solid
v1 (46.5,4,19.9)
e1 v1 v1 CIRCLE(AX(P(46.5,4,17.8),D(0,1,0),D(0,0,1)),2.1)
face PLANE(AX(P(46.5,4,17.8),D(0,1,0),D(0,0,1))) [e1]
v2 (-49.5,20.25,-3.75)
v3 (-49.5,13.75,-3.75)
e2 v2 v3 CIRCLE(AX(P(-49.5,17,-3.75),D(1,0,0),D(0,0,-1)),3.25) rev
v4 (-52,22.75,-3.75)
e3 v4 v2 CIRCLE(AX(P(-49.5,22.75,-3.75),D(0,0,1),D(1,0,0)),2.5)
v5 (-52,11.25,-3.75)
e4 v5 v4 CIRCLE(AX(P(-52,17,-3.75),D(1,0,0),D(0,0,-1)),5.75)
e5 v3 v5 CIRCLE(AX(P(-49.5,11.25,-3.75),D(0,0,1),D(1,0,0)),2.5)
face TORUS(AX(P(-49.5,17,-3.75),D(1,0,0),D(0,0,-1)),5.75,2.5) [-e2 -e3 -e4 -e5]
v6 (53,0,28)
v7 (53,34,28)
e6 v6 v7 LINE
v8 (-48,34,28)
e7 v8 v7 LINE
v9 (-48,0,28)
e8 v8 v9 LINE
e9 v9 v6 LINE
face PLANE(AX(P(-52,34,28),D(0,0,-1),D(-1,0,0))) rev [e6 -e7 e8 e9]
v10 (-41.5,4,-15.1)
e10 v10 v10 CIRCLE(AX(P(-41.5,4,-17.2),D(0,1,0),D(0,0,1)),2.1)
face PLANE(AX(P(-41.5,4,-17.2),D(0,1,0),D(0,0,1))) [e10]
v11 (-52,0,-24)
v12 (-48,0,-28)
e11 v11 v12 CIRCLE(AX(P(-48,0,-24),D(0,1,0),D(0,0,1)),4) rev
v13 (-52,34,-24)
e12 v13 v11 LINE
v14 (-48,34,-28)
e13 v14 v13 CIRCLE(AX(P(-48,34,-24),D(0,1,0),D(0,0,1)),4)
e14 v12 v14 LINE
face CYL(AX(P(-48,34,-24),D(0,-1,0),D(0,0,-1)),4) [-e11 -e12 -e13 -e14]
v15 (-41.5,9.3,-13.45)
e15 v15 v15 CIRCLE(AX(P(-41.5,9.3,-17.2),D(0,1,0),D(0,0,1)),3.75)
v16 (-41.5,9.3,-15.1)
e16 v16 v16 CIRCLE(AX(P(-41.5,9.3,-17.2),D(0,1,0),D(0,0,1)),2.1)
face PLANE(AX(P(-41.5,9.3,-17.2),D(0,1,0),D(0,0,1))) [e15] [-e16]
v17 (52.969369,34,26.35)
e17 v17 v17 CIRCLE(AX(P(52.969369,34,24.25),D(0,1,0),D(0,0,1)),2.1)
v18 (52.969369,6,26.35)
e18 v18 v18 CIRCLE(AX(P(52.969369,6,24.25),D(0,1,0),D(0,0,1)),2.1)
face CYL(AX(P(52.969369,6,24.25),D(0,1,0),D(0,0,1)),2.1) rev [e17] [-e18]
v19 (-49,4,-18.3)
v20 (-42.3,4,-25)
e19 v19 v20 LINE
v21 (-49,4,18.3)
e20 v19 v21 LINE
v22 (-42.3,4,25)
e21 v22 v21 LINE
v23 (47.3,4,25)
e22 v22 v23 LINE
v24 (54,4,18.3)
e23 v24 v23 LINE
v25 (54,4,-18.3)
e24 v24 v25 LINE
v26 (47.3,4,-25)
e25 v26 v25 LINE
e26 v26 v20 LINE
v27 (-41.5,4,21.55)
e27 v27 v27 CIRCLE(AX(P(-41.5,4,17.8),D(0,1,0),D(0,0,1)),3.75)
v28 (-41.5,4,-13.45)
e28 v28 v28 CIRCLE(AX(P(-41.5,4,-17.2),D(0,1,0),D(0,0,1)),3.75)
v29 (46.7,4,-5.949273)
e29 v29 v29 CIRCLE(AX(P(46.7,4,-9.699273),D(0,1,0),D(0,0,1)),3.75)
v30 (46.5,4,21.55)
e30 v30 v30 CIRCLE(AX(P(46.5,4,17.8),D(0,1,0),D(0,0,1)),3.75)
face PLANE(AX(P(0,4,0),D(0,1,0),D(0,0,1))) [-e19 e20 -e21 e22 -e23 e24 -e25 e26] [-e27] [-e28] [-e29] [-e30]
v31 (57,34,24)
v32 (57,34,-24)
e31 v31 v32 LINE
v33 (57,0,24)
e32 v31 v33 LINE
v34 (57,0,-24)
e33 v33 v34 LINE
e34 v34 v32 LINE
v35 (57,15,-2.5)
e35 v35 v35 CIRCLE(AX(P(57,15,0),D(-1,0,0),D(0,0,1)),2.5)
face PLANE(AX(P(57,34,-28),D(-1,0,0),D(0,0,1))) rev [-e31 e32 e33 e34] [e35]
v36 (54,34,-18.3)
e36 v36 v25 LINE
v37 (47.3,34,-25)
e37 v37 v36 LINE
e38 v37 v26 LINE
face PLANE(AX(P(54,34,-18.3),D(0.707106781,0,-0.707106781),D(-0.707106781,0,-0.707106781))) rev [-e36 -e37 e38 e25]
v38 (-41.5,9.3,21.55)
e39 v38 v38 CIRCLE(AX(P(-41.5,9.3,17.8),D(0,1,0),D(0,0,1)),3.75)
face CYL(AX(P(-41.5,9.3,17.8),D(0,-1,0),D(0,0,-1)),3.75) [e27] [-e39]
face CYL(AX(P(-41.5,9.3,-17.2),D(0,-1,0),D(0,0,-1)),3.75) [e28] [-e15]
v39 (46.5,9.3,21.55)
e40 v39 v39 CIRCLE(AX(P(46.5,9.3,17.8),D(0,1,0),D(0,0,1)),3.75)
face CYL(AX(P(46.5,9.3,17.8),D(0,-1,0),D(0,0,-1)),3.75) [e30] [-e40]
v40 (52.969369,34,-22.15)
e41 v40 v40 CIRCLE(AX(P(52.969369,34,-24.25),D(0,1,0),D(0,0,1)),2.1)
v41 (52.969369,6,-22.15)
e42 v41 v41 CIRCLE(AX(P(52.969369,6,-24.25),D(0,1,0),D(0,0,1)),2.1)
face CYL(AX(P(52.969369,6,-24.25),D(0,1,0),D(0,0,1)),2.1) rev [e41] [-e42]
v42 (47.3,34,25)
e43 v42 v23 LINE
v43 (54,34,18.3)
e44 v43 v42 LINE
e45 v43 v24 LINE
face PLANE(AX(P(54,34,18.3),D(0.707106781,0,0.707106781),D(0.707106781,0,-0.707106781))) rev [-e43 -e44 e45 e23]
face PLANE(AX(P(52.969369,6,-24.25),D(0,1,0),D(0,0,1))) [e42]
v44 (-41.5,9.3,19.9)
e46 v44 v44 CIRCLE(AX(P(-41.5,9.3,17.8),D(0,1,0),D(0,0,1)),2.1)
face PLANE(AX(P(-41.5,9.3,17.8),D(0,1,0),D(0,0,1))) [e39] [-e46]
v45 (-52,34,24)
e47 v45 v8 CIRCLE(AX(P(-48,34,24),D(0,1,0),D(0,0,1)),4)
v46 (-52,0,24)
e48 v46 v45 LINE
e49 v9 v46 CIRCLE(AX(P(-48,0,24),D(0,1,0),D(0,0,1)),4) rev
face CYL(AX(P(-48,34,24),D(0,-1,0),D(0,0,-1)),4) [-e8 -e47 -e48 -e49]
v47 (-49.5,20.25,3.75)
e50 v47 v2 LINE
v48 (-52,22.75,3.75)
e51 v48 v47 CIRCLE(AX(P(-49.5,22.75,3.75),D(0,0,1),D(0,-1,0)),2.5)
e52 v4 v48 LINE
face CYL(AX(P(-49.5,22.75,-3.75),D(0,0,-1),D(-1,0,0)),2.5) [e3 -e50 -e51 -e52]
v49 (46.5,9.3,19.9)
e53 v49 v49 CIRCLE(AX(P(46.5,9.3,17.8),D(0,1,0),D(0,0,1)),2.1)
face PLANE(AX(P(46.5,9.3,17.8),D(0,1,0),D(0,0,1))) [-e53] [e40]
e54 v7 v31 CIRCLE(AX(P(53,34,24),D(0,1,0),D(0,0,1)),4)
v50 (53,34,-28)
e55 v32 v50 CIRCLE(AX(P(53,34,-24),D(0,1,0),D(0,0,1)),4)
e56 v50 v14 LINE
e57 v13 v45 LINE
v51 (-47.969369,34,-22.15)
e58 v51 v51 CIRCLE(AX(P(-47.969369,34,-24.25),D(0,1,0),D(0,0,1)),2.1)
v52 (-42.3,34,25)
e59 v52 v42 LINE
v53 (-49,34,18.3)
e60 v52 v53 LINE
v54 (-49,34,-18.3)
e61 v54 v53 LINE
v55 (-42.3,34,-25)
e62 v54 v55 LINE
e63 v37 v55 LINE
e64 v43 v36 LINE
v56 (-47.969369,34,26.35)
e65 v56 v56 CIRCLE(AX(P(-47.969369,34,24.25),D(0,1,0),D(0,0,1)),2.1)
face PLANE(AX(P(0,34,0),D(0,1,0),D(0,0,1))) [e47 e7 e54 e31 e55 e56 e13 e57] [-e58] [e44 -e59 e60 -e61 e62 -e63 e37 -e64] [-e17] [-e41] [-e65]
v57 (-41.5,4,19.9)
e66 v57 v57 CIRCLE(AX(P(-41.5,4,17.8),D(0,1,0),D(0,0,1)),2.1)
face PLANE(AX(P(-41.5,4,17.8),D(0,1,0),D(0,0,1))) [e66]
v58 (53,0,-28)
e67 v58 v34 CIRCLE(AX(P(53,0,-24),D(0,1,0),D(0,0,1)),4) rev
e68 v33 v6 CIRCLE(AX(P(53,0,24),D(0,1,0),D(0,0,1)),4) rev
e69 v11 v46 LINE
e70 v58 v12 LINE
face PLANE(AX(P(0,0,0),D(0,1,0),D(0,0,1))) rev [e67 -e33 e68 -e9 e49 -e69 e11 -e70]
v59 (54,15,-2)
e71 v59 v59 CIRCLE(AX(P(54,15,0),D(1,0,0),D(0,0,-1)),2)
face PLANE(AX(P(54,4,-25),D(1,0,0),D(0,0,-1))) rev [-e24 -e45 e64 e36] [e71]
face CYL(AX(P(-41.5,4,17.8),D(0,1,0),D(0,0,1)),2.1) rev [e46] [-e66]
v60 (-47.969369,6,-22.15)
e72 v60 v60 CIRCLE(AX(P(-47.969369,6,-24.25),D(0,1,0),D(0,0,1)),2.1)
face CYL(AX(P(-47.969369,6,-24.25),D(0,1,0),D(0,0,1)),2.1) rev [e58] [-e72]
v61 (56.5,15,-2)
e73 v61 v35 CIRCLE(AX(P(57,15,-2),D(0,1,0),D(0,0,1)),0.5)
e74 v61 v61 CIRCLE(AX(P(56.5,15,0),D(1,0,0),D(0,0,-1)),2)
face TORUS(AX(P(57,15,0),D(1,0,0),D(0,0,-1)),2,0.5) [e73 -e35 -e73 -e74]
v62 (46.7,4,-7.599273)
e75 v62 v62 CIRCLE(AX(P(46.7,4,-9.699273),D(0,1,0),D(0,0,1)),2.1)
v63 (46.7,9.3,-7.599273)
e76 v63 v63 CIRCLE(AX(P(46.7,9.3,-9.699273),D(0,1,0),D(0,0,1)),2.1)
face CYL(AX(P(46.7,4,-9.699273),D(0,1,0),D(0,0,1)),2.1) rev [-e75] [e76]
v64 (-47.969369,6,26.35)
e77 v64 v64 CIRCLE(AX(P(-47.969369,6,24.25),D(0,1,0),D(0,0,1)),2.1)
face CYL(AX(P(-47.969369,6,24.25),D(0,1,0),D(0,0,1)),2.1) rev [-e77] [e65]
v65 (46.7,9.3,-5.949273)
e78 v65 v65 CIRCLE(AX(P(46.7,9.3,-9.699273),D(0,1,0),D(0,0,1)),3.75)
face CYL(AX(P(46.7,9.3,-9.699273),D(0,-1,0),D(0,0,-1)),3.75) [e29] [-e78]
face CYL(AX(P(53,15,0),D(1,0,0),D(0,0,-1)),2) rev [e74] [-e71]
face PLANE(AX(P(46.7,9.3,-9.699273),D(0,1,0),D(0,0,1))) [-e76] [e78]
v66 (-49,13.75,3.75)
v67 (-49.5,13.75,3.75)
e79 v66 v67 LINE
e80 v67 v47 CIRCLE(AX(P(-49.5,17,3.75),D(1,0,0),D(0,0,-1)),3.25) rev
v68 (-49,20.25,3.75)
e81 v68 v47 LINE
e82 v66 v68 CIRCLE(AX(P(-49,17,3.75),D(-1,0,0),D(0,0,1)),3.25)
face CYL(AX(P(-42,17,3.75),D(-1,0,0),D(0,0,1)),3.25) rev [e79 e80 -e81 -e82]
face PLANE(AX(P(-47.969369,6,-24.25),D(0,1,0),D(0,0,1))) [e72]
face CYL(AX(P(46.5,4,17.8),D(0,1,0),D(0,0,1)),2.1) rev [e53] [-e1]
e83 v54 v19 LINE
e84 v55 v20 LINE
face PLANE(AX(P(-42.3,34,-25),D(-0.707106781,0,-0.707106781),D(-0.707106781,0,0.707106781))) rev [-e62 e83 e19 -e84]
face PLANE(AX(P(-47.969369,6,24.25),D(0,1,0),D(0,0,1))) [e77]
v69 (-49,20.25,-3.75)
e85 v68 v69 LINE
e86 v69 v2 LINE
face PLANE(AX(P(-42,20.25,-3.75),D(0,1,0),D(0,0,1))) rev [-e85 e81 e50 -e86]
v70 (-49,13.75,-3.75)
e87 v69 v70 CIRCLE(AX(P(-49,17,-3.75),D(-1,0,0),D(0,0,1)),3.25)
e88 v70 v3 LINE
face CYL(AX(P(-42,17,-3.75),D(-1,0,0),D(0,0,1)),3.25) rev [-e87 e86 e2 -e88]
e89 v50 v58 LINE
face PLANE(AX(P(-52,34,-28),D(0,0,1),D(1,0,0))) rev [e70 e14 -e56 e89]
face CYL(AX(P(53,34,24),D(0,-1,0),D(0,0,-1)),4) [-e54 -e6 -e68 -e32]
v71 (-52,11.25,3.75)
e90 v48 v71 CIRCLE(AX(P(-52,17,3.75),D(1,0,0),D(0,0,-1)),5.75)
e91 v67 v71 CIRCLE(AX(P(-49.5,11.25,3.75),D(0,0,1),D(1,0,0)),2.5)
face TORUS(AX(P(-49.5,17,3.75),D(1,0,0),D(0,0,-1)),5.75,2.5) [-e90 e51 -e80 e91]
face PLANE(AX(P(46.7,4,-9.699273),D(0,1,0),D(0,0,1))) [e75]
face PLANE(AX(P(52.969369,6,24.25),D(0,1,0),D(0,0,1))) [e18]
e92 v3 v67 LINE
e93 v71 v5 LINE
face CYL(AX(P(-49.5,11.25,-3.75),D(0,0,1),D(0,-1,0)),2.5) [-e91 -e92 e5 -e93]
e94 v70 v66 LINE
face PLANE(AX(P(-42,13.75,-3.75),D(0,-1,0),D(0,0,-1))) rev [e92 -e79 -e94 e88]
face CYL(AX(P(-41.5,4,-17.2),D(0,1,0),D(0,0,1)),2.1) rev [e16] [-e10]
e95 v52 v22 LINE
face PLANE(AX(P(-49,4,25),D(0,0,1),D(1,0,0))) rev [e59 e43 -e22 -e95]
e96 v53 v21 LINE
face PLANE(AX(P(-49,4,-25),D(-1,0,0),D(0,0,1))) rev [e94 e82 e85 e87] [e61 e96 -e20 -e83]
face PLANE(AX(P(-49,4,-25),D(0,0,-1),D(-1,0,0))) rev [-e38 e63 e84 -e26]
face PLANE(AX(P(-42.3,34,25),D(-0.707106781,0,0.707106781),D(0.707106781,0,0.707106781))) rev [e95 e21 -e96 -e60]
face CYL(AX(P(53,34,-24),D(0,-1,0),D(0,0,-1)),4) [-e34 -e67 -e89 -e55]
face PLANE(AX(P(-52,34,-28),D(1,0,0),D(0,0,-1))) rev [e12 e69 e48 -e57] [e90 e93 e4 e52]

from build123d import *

# Parameters (mm, degrees)
SKETCH1_W                          = 109
SKETCH1_H                          = 56
BASE_PLATE_DEPTH                   = 34
SKETCH2_W                          = 103
SKETCH2_H                          = 50
BASE_PLATE_EXTRUDED_CUT_PART_DEPTH = 30
BASE_PLATE_4_SCREWS_DEPTH          = 30
FILLET1_R                          = 4
SKETCH4_R                          = 3.75
PCB_STANDS_DEPTH                   = 5.3
SKETCH5_R                          = 2.1
CUT_EXTRUDE1_DEPTH                 = 5.3
SKETCH8_R                          = 2
CUT_EXTRUDE4_DEPTH                 = 4
SKETCH71_R                         = 2.1
CUT_EXTRUDE5_DEPTH                 = 28
CUT_EXTRUDE7_DEPTH                 = 10
FILLET3_R                          = 2.5


# Read off the part's stored shape, not the designer's step: Sweep1
with BuildPart() as part:
    # Sketch1 → Base_Plate (new body)
    with BuildSketch(Plane(origin=(0, 0, 0), x_dir=(1, 0, 0), z_dir=(0, 1, 0))):
        with Locations((2.5, 0)):
            Rectangle(SKETCH1_W, SKETCH1_H)
    extrude(amount=BASE_PLATE_DEPTH)

    # Sketch2 → Base_Plate_Extruded_Cut_Part (cut)
    with BuildSketch(Plane(origin=(0, 34, 0), x_dir=(1, 0, 0), z_dir=(0, 1, 0))):
        with Locations((2.5, 0)):
            Rectangle(SKETCH2_W, SKETCH2_H)
    extrude(amount=-BASE_PLATE_EXTRUDED_CUT_PART_DEPTH, mode=Mode.SUBTRACT)

    # Sketch3 → Base_Plate_4_screws (add)
    with BuildSketch(Plane(origin=(0, 4, 0), x_dir=(1, 0, 0), z_dir=(0, 1, 0))):
        Polygon((-49, -25), (-42.3, -25), (-49, -18.3), align=None)
        Polygon((-49, 25), (-42.3, 25), (-49, 18.3), align=None)
        Polygon((54, 25), (54, 18.3), (47.3, 25), align=None)
        Polygon((54, -25), (54, -18.3), (47.3, -25), align=None)
    extrude(amount=BASE_PLATE_4_SCREWS_DEPTH)

    # Fillet1
    fillet1_edges = [part.edges().sort_by_distance(p)[0] for p in [
        (-52, 17, -28),
        (57, 17, -28),
        (57, 17, 28),
        (-52, 17, 28),
    ]]
    fillet(fillet1_edges, radius=FILLET1_R)

    # Sketch4 → PCB_Stands (add)
    with BuildSketch(Plane(origin=(0, 4, 0), x_dir=(1, 0, 0), z_dir=(0, 1, 0))):
        with Locations(Location((-41.5, -17.8, 0), (0, 0, 270))):
            Circle(SKETCH4_R)
        with Locations(Location((-41.5, 17.2, 0), (0, 0, 270))):
            Circle(SKETCH4_R)
        with Locations(Location((46.5, -17.8, 0), (0, 0, 270))):
            Circle(SKETCH4_R)
        with Locations(Location((46.7, 9.699272718, 0), (0, 0, 270))):
            Circle(SKETCH4_R)
    extrude(amount=PCB_STANDS_DEPTH)

    # Sketch5 → Cut-Extrude1 (cut)
    with BuildSketch(Plane(origin=(0, 9.3, 0), x_dir=(1, 0, 0), z_dir=(0, 1, 0))):
        with Locations(Location((-41.5, 17.2, 0), (0, 0, 270))):
            Circle(SKETCH5_R)
        with Locations(Location((-41.5, -17.8, 0), (0, 0, 270))):
            Circle(SKETCH5_R)
        with Locations(Location((46.5, -17.8, 0), (0, 0, 270))):
            Circle(SKETCH5_R)
        with Locations(Location((46.7, 9.699272718, 0), (0, 0, 270))):
            Circle(SKETCH5_R)
    extrude(amount=-CUT_EXTRUDE1_DEPTH, mode=Mode.SUBTRACT)

    # Sketch8 → Cut-Extrude4 (cut)
    with BuildSketch(Plane(origin=(57, 0, 0), x_dir=(0, 0, -1), z_dir=(1, 0, 0))):
        with Locations((0, 15)):
            Circle(SKETCH8_R)
    extrude(amount=-CUT_EXTRUDE4_DEPTH, mode=Mode.SUBTRACT)

    # Sweep1 outline → Sweep1 (revolve)
    with BuildSketch(Plane(origin=(0, 15, 0), x_dir=(0, 1, 0), z_dir=(0, 0, -1))):
        with BuildLine():
            Line((2, 57), (2.5, 57))
            ThreePointArc((2.5, 57), (1.646446609, 57.353553391), (2, 56.5))
            Line((2, 56.5), (2, 57))
        make_face()
    revolve(axis=Axis((0, 15, 0), (1, 0, 0)))

    # Sketch71 → Cut-Extrude5 (cut)
    with BuildSketch(Plane(origin=(0, 34, 0), x_dir=(1, 0, 0), z_dir=(0, 1, 0))):
        with Locations(Location((-47.969368965, -24.25, 0), (0, 0, 270))):
            Circle(SKETCH71_R)
        with Locations(Location((52.969368965, -24.25, 0), (0, 0, 270))):
            Circle(SKETCH71_R)
        with Locations(Location((52.969368965, 24.25, 0), (0, 0, 270))):
            Circle(SKETCH71_R)
        with Locations(Location((-47.969368965, 24.25, 0), (0, 0, 270))):
            Circle(SKETCH71_R)
    extrude(amount=-CUT_EXTRUDE5_DEPTH, mode=Mode.SUBTRACT)

    # Sketch82 → Cut-Extrude7 (cut)
    with BuildSketch(Plane.ZY.offset(52)):
        with BuildLine():
            Line((-3.75, 20.25), (3.75, 20.25))
            ThreePointArc((3.75, 20.25), (7, 17), (3.75, 13.75))
            Line((3.75, 13.75), (-3.75, 13.75))
            ThreePointArc((-3.75, 13.75), (-7, 17), (-3.75, 20.25))
        make_face()
    extrude(amount=-CUT_EXTRUDE7_DEPTH, mode=Mode.SUBTRACT)

    # Fillet3
    fillet3_edges = [part.edges().sort_by_distance(p)[0] for p in [
        (-52, 17, -7),
        (-52, 13.75, 0),
        (-52, 17, 7),
        (-52, 20.25, 0),
    ]]
    fillet(fillet3_edges, radius=FILLET3_R)


solid = part.part
